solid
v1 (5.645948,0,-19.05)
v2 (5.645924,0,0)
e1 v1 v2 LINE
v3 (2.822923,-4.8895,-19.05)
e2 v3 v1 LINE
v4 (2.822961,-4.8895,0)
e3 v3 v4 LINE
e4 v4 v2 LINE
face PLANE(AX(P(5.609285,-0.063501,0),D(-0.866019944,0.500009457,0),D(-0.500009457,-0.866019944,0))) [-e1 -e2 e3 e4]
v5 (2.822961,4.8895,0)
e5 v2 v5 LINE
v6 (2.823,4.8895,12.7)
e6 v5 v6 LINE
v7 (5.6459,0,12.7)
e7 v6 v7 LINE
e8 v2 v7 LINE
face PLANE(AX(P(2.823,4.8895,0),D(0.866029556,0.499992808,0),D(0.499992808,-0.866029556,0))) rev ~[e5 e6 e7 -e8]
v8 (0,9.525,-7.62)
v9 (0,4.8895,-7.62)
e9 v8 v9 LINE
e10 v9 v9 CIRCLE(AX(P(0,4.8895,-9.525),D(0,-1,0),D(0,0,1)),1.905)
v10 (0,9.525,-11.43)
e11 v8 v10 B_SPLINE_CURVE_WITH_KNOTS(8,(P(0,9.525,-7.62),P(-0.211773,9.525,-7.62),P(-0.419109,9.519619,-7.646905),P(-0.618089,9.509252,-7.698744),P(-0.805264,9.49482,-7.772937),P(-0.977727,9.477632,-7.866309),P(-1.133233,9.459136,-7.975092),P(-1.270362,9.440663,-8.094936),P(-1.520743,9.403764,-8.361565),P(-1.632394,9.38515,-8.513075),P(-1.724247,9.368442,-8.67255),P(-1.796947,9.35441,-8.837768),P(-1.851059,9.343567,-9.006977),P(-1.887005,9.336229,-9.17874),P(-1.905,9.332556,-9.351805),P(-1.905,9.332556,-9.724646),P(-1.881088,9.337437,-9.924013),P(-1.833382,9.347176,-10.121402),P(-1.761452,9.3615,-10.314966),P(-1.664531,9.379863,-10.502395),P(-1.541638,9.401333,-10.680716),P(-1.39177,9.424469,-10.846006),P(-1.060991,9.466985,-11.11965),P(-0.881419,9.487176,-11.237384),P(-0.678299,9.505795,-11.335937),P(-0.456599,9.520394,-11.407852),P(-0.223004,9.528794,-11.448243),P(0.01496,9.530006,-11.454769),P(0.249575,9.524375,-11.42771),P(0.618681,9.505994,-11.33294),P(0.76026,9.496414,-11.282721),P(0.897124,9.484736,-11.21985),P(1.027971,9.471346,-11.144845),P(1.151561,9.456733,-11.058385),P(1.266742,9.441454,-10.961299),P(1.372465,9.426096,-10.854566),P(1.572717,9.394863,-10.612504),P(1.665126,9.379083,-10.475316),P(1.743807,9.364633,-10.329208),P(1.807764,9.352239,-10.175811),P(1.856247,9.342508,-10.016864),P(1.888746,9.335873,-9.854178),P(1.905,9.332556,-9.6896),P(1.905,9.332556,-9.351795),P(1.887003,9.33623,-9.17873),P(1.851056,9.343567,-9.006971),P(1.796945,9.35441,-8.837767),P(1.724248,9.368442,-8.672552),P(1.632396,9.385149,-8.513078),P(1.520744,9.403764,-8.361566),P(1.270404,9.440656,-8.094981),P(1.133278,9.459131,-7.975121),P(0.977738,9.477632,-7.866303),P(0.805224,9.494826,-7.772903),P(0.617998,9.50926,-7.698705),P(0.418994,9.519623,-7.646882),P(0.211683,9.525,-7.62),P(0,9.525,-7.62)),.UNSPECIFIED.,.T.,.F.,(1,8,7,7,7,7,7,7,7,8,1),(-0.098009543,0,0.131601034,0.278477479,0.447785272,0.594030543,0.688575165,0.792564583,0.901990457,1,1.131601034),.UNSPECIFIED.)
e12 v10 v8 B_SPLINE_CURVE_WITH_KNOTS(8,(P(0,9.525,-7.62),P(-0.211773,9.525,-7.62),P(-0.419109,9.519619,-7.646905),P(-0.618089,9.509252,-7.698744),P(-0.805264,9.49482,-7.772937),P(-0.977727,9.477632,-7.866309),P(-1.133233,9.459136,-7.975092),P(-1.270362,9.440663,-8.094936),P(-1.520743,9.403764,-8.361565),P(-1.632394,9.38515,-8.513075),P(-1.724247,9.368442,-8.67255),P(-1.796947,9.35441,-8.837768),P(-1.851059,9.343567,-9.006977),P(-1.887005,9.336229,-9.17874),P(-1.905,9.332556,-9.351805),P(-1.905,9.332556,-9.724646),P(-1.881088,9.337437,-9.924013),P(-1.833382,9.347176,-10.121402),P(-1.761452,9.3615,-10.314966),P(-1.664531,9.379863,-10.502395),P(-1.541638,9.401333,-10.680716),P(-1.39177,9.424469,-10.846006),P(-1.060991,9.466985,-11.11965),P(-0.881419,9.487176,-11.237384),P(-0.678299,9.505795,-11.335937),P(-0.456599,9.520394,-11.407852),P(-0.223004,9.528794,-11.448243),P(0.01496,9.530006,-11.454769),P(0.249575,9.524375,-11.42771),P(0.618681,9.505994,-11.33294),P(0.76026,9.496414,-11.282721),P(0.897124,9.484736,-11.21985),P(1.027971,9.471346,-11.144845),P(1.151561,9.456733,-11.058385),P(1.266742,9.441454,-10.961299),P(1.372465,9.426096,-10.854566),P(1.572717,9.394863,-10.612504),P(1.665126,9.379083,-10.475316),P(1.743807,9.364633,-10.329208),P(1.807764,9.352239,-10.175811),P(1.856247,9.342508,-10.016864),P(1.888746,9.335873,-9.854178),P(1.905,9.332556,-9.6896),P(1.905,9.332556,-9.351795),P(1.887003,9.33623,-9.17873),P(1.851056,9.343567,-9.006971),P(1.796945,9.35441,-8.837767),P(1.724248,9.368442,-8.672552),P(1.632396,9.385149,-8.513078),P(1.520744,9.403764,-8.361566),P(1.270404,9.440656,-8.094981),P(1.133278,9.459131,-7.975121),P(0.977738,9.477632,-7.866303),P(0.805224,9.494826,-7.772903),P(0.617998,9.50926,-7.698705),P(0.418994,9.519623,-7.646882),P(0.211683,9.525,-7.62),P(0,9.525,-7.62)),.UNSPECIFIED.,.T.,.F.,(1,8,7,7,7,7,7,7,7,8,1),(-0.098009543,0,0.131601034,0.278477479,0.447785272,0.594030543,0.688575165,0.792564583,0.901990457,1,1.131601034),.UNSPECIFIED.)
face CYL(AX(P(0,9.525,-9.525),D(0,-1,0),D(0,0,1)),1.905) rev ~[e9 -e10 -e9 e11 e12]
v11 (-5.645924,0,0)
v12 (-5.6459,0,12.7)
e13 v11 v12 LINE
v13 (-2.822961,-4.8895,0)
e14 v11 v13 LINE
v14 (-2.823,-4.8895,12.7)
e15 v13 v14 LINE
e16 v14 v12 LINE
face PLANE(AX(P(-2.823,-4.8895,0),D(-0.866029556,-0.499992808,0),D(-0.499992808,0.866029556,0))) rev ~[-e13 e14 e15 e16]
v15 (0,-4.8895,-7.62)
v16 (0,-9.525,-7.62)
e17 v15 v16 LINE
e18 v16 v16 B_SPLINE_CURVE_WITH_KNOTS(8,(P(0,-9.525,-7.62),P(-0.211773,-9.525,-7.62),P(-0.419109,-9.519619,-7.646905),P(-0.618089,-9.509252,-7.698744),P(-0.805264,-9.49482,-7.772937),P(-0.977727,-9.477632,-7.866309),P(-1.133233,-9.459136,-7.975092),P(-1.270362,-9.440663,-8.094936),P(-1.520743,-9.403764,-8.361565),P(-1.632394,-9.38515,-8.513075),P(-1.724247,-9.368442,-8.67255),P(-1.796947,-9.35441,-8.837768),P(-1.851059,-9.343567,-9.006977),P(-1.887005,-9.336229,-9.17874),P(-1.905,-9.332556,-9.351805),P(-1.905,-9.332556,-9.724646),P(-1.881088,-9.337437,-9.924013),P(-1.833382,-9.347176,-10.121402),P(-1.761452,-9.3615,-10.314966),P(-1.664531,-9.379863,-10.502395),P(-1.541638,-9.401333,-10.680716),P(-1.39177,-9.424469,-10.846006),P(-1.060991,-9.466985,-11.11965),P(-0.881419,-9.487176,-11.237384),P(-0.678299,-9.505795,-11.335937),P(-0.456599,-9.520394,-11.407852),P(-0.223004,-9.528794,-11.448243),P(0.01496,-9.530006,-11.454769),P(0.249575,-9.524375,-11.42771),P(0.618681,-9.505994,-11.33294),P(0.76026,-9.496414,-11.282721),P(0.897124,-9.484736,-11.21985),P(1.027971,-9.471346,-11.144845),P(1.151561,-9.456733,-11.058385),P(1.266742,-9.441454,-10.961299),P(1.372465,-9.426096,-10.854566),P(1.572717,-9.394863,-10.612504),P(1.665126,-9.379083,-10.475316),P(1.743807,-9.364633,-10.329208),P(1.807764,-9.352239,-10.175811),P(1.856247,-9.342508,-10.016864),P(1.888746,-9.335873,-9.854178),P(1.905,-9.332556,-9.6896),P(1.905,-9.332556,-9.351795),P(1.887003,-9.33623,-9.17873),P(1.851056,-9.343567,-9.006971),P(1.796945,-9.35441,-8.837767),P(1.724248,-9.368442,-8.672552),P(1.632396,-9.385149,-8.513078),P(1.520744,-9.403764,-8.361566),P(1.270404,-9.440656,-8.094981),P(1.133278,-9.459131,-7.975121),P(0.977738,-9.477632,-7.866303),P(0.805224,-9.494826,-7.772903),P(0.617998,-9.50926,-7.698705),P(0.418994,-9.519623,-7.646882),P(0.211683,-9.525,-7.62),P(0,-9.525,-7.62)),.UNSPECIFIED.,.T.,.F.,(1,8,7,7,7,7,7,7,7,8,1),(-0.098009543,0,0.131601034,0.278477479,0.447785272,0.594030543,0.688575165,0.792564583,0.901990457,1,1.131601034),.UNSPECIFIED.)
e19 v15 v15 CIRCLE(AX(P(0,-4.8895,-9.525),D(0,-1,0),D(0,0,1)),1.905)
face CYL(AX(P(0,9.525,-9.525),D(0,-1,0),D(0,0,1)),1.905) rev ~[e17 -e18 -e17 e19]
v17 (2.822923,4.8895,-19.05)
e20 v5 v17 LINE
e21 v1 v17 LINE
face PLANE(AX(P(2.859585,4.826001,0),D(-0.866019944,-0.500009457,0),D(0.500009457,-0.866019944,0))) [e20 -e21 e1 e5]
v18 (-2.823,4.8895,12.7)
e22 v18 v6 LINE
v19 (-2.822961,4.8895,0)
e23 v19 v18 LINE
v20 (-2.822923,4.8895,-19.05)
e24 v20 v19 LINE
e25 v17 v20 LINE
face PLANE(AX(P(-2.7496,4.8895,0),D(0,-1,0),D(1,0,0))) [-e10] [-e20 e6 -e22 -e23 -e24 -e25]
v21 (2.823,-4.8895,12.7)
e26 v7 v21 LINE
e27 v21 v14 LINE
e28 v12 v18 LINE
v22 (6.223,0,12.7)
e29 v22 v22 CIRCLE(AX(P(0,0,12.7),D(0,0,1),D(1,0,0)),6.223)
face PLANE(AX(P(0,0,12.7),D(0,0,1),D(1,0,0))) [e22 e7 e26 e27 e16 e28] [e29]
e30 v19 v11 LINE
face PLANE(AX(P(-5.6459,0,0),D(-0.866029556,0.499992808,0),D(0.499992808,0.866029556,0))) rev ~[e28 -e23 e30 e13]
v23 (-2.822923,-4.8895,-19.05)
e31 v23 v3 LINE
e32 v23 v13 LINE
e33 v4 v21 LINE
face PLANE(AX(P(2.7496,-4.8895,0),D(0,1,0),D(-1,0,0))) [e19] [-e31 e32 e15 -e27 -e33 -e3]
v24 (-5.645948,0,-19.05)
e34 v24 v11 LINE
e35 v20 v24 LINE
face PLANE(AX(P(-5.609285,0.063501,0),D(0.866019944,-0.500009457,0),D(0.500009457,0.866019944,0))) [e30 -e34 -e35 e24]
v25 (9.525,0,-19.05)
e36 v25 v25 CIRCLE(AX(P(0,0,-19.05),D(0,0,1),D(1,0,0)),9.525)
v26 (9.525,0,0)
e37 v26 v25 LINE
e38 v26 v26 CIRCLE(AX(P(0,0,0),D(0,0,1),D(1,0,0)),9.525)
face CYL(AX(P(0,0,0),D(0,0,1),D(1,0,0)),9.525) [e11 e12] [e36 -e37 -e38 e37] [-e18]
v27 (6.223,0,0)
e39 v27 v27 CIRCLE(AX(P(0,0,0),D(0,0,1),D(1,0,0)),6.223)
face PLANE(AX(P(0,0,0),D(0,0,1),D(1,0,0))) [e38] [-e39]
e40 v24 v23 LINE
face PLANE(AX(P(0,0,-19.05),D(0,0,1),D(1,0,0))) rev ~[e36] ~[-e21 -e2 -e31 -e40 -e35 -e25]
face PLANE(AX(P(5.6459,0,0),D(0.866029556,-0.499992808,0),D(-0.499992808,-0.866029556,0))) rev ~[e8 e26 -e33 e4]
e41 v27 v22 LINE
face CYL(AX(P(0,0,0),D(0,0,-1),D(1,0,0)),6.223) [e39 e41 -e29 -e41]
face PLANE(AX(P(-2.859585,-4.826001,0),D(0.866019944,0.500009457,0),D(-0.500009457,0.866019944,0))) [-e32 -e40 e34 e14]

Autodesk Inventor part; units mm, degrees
ref_plane "YZ Plane" through (0, 0, 0) normal (1, 0, 0) x (0, 1, 0)
ref_plane "XY Plane" through (0, 0, 0) normal (0, 0, 1) x (1, 0, 0)
sketch "Sketch1" plane through (0, 0, 0) normal (0, 0, 1) x (1, 0, 0)
  line L0 (2.7496, 4.7625) -> (5.4993, 0)
  line L1 (5.4993, 0) -> (2.7496, -4.7625)
  line L2 (2.7496, -4.7625) -> (-2.7496, -4.7625)
  line L3 (-2.7496, -4.7625) -> (-5.4993, 0)
  line L4 (-5.4993, 0) -> (-2.7496, 4.7625)
  line L5 (-2.7496, 4.7625) -> (2.7496, 4.7625)
  circle A0 centre (0, 0) radius 9.525
  circle A1 centre (0, 0) radius 5.4993 construction
  dimension "d0" = 9.525
  dimension "d2" = 19.05
  dimension "d3" = 4.0257
extrude "Extrusion1" add sketch "Sketch1" against normal blind 19.05
thicken "Thicken Hex" operation add thickness 0.127 both sides no extend neighbours yes toward (-0.8660254, 0.5, 0) faces at (-4.5827, 1.5875, -6.35) (-3.6662, -3.175, -6.35) (0.9165, -4.7625, -6.35) (-0.9165, 4.7625, -6.35) (3.6662, 3.175, -6.35) (4.5827, -1.5875, -6.35)
sketch "Sketch3" plane through (0, 0, 0) normal (0, 0, 1) x (1, 0, 0)
  line L0 (5.6459, 0) -> (2.823, -4.8895)
  line L1 (2.823, -4.8895) -> (-2.823, -4.8895)
  line L2 (-2.823, -4.8895) -> (-5.6459, 0)
  line L3 (-5.6459, 0) -> (-2.823, 4.8895)
  line L4 (-2.823, 4.8895) -> (2.823, 4.8895)
  line L5 (2.823, 4.8895) -> (5.6459, 0)
  line L6 (2.823, 4.8895) -> (5.6459, 0) projected
  circle A0 centre (0, 0) radius 6.35
  dimension "d10" = 12.7
extrude "Extrusion2" add sketch "Sketch3" along normal blind 12.7
thicken "Thicken2" operation add thickness 0.127 both sides no extend neighbours yes toward (-0.9967573, 0.0804666, 0) faces at (6.3294, -0.511, 8.4667)
ref_plane "Work Plane1" through (0, 9.525, 0) normal (0, 1, 0) x (-1, 0, 0)
sketch "Sketch4" plane through (0, 9.525, 0) normal (0, 1, 0) x (-1, 0, 0)
  line L0 (0, 0) -> (0, -19.05) construction
  line L1 (2.823, -19.05) -> (-2.823, -19.05) construction
  point P0 (0, -9.525)
hole "Hole1" at (0, 9.525, -9.525) direction (0, -1, 0) diameter 3.81 end through all clearance for "Flat Head Machine Screw (82)" size "#6" standard "Ansi Unified Screw Threads"
equation "\"d0\" = hexSize"
equation "\"d2\" = exteriorDiameter"
equation "\"d4\" = length"
equation "\"d6\" = printSpacing"
equation "\"d7\" = printSpacing"
equation "\"d10\" = baseBushingDiameter"
equation "\"d8\" = baseBushingLength"
equation "\"d11\" = printSpacing"
equation "\"d12\" = printSpacing"
equation "\"hexSize\" = 9.525"
equation "\"exteriorDiameter\" = 19.05"
equation "\"length\" = 19.05"
equation "\"printSpacing\" = 0.127"
equation "\"baseBushingDiameter\" = 12.7"
equation "\"baseBushingLength\" = 12.7"
properties part number "3_8x3_4x3_4-hexBearingEndCap" material "PC/ABS Plastic"
